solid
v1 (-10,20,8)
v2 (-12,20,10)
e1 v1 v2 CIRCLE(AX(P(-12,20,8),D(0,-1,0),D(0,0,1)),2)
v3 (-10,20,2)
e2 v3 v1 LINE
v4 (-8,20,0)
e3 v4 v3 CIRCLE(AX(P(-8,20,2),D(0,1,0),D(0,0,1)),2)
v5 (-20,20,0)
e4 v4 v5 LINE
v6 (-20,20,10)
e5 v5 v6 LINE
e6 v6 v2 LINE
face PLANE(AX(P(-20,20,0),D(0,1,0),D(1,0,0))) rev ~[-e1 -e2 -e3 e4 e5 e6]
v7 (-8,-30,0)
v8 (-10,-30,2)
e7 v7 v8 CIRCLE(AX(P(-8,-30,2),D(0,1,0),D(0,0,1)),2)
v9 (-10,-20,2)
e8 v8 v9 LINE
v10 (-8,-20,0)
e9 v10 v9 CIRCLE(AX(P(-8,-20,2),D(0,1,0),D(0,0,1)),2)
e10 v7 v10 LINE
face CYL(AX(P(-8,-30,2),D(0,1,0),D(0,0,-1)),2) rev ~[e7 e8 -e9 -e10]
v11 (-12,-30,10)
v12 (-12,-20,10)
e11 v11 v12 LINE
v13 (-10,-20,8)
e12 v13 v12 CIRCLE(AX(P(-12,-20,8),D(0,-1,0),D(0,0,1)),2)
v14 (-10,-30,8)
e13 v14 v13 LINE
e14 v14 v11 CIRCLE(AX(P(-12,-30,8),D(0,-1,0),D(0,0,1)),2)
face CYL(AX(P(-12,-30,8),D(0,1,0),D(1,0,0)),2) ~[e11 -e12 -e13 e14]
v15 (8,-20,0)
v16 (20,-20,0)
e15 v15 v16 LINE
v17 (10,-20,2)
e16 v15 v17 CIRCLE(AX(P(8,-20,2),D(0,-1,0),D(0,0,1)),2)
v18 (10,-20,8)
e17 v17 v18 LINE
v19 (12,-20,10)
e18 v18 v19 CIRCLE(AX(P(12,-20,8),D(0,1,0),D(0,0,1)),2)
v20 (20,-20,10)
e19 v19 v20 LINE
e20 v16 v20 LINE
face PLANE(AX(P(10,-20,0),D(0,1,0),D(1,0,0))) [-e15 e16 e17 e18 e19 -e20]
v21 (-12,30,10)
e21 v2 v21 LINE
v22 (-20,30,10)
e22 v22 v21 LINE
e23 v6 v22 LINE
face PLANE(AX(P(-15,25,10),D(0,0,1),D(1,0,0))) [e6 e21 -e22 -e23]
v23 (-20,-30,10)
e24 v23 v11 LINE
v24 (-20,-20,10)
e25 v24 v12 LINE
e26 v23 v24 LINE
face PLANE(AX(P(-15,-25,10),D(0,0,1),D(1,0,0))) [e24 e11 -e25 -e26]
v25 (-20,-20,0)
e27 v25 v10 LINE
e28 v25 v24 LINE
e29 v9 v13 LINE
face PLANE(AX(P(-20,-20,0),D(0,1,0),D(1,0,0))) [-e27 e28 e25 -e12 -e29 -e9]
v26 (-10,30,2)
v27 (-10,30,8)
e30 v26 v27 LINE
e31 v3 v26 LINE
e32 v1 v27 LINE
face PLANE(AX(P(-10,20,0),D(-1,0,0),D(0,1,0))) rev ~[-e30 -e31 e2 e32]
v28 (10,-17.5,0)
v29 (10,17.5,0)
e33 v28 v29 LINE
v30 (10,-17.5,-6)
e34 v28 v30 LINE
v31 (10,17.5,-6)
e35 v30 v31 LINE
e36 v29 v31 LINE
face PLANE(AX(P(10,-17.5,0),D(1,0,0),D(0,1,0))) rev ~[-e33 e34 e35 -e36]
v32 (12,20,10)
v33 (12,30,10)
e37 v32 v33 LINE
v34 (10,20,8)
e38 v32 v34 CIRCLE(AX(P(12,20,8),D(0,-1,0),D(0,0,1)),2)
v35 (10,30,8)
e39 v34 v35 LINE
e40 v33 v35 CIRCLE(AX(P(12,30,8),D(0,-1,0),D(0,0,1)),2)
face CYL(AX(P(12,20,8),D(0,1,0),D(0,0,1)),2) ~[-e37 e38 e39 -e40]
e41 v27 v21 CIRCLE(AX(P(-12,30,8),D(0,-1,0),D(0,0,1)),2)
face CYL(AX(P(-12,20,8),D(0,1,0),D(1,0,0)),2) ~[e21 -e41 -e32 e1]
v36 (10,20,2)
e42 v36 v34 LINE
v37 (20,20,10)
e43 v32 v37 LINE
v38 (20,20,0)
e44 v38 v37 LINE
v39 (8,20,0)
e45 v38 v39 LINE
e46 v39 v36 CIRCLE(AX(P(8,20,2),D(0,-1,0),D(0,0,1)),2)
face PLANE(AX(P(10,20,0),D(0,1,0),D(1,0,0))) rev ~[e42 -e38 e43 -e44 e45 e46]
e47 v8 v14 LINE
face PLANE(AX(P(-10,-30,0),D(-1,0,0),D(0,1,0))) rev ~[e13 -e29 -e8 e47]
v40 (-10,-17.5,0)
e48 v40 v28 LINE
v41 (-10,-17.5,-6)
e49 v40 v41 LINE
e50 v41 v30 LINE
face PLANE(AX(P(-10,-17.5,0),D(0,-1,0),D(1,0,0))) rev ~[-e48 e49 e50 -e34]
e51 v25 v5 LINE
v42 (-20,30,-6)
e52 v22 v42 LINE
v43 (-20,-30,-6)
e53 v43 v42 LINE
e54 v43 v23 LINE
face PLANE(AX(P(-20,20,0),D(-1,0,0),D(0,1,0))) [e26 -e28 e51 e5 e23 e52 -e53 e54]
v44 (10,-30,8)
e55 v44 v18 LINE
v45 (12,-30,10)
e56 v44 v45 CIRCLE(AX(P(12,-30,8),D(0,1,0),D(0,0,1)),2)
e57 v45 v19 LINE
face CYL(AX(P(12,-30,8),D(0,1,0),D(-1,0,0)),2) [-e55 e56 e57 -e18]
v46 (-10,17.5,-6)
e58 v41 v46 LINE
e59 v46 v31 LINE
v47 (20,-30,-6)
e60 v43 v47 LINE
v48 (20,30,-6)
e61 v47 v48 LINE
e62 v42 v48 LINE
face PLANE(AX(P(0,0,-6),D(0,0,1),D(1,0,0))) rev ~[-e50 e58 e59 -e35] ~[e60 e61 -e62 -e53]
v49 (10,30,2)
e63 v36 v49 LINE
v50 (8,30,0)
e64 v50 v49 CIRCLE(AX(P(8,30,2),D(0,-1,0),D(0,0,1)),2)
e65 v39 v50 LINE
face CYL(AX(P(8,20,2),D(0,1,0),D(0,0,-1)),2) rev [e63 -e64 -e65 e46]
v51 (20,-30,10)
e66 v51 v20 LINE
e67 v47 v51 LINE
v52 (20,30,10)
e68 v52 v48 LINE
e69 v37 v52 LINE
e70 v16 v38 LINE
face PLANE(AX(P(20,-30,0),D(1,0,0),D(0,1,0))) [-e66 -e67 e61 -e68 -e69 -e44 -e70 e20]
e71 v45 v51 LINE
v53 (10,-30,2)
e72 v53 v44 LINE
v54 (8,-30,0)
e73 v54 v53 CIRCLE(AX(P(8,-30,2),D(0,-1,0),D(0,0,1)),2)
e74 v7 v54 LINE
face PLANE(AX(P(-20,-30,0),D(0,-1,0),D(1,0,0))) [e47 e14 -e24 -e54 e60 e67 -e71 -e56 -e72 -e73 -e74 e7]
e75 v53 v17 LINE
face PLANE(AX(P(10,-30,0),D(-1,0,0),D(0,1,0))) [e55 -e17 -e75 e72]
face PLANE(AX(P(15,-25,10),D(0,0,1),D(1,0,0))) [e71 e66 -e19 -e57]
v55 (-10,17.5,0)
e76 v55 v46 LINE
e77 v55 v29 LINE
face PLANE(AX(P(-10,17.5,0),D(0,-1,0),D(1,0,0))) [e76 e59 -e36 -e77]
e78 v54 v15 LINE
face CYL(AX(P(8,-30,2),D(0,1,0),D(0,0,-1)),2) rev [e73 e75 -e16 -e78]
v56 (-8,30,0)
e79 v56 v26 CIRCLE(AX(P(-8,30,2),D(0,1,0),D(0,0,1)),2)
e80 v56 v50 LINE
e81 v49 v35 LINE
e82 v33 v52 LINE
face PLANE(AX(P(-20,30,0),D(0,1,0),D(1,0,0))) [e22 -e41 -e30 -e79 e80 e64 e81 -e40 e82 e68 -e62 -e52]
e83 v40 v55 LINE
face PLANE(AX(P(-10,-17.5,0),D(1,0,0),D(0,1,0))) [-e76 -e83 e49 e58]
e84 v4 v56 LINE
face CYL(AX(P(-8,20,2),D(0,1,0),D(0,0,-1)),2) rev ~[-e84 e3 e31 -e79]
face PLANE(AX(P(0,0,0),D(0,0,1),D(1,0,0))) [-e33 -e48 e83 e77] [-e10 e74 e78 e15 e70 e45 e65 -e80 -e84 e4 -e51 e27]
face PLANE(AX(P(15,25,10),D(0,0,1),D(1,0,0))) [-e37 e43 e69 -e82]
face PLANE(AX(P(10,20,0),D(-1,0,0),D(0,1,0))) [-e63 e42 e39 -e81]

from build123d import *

# Parameters (mm, degrees)
F0_W      = 40
F0_H      = 60
F1_DEPTH  = 6
F2_W      = 10
F2_H      = 10
F3_DEPTH  = 10
F13_R     = 2
F14_W     = 20
F14_H     = 35
F15_DEPTH = 25


# Not quite as in the source:
# - the program builds the solid bodies; features that only make, move or delete a surface that nothing else refers to are left out


with BuildPart() as f1:
    # F0 (on Top) → F1 (new body)
    with BuildSketch(Plane.XY):
        Rectangle(F0_W, F0_H)
    extrude(amount=-F1_DEPTH)

    # F2 (on face) → F3 (join)
    with BuildSketch(Plane.XY):
        with Locations((-15, 25)):
            Rectangle(F2_W, F2_H)
        with Locations((15, 25)):
            Rectangle(F2_W, F2_H)
        with Locations((15, -25)):
            Rectangle(F2_W, F2_H)
        with Locations((-15, -25)):
            Rectangle(F2_W, F2_H)
    extrude(amount=F3_DEPTH)

    # F13
    f13_edges = [f1.edges().sort_by_distance(p)[0] for p in [
        (-10, 25, 10),
        (-10, -25, 10),
        (-10, -25, 0),
        (-10, 25, 0),
        (10, -25, 10),
        (10, 25, 10),
        (10, -25, 0),
        (10, 25, 0),
    ]]
    fillet(f13_edges, radius=F13_R)

    # F14 (on face) → F15 (cut)
    with BuildSketch(Plane.XY):
        Rectangle(F14_W, F14_H)
    extrude(amount=-F15_DEPTH, mode=Mode.SUBTRACT)


solid = f1.part
